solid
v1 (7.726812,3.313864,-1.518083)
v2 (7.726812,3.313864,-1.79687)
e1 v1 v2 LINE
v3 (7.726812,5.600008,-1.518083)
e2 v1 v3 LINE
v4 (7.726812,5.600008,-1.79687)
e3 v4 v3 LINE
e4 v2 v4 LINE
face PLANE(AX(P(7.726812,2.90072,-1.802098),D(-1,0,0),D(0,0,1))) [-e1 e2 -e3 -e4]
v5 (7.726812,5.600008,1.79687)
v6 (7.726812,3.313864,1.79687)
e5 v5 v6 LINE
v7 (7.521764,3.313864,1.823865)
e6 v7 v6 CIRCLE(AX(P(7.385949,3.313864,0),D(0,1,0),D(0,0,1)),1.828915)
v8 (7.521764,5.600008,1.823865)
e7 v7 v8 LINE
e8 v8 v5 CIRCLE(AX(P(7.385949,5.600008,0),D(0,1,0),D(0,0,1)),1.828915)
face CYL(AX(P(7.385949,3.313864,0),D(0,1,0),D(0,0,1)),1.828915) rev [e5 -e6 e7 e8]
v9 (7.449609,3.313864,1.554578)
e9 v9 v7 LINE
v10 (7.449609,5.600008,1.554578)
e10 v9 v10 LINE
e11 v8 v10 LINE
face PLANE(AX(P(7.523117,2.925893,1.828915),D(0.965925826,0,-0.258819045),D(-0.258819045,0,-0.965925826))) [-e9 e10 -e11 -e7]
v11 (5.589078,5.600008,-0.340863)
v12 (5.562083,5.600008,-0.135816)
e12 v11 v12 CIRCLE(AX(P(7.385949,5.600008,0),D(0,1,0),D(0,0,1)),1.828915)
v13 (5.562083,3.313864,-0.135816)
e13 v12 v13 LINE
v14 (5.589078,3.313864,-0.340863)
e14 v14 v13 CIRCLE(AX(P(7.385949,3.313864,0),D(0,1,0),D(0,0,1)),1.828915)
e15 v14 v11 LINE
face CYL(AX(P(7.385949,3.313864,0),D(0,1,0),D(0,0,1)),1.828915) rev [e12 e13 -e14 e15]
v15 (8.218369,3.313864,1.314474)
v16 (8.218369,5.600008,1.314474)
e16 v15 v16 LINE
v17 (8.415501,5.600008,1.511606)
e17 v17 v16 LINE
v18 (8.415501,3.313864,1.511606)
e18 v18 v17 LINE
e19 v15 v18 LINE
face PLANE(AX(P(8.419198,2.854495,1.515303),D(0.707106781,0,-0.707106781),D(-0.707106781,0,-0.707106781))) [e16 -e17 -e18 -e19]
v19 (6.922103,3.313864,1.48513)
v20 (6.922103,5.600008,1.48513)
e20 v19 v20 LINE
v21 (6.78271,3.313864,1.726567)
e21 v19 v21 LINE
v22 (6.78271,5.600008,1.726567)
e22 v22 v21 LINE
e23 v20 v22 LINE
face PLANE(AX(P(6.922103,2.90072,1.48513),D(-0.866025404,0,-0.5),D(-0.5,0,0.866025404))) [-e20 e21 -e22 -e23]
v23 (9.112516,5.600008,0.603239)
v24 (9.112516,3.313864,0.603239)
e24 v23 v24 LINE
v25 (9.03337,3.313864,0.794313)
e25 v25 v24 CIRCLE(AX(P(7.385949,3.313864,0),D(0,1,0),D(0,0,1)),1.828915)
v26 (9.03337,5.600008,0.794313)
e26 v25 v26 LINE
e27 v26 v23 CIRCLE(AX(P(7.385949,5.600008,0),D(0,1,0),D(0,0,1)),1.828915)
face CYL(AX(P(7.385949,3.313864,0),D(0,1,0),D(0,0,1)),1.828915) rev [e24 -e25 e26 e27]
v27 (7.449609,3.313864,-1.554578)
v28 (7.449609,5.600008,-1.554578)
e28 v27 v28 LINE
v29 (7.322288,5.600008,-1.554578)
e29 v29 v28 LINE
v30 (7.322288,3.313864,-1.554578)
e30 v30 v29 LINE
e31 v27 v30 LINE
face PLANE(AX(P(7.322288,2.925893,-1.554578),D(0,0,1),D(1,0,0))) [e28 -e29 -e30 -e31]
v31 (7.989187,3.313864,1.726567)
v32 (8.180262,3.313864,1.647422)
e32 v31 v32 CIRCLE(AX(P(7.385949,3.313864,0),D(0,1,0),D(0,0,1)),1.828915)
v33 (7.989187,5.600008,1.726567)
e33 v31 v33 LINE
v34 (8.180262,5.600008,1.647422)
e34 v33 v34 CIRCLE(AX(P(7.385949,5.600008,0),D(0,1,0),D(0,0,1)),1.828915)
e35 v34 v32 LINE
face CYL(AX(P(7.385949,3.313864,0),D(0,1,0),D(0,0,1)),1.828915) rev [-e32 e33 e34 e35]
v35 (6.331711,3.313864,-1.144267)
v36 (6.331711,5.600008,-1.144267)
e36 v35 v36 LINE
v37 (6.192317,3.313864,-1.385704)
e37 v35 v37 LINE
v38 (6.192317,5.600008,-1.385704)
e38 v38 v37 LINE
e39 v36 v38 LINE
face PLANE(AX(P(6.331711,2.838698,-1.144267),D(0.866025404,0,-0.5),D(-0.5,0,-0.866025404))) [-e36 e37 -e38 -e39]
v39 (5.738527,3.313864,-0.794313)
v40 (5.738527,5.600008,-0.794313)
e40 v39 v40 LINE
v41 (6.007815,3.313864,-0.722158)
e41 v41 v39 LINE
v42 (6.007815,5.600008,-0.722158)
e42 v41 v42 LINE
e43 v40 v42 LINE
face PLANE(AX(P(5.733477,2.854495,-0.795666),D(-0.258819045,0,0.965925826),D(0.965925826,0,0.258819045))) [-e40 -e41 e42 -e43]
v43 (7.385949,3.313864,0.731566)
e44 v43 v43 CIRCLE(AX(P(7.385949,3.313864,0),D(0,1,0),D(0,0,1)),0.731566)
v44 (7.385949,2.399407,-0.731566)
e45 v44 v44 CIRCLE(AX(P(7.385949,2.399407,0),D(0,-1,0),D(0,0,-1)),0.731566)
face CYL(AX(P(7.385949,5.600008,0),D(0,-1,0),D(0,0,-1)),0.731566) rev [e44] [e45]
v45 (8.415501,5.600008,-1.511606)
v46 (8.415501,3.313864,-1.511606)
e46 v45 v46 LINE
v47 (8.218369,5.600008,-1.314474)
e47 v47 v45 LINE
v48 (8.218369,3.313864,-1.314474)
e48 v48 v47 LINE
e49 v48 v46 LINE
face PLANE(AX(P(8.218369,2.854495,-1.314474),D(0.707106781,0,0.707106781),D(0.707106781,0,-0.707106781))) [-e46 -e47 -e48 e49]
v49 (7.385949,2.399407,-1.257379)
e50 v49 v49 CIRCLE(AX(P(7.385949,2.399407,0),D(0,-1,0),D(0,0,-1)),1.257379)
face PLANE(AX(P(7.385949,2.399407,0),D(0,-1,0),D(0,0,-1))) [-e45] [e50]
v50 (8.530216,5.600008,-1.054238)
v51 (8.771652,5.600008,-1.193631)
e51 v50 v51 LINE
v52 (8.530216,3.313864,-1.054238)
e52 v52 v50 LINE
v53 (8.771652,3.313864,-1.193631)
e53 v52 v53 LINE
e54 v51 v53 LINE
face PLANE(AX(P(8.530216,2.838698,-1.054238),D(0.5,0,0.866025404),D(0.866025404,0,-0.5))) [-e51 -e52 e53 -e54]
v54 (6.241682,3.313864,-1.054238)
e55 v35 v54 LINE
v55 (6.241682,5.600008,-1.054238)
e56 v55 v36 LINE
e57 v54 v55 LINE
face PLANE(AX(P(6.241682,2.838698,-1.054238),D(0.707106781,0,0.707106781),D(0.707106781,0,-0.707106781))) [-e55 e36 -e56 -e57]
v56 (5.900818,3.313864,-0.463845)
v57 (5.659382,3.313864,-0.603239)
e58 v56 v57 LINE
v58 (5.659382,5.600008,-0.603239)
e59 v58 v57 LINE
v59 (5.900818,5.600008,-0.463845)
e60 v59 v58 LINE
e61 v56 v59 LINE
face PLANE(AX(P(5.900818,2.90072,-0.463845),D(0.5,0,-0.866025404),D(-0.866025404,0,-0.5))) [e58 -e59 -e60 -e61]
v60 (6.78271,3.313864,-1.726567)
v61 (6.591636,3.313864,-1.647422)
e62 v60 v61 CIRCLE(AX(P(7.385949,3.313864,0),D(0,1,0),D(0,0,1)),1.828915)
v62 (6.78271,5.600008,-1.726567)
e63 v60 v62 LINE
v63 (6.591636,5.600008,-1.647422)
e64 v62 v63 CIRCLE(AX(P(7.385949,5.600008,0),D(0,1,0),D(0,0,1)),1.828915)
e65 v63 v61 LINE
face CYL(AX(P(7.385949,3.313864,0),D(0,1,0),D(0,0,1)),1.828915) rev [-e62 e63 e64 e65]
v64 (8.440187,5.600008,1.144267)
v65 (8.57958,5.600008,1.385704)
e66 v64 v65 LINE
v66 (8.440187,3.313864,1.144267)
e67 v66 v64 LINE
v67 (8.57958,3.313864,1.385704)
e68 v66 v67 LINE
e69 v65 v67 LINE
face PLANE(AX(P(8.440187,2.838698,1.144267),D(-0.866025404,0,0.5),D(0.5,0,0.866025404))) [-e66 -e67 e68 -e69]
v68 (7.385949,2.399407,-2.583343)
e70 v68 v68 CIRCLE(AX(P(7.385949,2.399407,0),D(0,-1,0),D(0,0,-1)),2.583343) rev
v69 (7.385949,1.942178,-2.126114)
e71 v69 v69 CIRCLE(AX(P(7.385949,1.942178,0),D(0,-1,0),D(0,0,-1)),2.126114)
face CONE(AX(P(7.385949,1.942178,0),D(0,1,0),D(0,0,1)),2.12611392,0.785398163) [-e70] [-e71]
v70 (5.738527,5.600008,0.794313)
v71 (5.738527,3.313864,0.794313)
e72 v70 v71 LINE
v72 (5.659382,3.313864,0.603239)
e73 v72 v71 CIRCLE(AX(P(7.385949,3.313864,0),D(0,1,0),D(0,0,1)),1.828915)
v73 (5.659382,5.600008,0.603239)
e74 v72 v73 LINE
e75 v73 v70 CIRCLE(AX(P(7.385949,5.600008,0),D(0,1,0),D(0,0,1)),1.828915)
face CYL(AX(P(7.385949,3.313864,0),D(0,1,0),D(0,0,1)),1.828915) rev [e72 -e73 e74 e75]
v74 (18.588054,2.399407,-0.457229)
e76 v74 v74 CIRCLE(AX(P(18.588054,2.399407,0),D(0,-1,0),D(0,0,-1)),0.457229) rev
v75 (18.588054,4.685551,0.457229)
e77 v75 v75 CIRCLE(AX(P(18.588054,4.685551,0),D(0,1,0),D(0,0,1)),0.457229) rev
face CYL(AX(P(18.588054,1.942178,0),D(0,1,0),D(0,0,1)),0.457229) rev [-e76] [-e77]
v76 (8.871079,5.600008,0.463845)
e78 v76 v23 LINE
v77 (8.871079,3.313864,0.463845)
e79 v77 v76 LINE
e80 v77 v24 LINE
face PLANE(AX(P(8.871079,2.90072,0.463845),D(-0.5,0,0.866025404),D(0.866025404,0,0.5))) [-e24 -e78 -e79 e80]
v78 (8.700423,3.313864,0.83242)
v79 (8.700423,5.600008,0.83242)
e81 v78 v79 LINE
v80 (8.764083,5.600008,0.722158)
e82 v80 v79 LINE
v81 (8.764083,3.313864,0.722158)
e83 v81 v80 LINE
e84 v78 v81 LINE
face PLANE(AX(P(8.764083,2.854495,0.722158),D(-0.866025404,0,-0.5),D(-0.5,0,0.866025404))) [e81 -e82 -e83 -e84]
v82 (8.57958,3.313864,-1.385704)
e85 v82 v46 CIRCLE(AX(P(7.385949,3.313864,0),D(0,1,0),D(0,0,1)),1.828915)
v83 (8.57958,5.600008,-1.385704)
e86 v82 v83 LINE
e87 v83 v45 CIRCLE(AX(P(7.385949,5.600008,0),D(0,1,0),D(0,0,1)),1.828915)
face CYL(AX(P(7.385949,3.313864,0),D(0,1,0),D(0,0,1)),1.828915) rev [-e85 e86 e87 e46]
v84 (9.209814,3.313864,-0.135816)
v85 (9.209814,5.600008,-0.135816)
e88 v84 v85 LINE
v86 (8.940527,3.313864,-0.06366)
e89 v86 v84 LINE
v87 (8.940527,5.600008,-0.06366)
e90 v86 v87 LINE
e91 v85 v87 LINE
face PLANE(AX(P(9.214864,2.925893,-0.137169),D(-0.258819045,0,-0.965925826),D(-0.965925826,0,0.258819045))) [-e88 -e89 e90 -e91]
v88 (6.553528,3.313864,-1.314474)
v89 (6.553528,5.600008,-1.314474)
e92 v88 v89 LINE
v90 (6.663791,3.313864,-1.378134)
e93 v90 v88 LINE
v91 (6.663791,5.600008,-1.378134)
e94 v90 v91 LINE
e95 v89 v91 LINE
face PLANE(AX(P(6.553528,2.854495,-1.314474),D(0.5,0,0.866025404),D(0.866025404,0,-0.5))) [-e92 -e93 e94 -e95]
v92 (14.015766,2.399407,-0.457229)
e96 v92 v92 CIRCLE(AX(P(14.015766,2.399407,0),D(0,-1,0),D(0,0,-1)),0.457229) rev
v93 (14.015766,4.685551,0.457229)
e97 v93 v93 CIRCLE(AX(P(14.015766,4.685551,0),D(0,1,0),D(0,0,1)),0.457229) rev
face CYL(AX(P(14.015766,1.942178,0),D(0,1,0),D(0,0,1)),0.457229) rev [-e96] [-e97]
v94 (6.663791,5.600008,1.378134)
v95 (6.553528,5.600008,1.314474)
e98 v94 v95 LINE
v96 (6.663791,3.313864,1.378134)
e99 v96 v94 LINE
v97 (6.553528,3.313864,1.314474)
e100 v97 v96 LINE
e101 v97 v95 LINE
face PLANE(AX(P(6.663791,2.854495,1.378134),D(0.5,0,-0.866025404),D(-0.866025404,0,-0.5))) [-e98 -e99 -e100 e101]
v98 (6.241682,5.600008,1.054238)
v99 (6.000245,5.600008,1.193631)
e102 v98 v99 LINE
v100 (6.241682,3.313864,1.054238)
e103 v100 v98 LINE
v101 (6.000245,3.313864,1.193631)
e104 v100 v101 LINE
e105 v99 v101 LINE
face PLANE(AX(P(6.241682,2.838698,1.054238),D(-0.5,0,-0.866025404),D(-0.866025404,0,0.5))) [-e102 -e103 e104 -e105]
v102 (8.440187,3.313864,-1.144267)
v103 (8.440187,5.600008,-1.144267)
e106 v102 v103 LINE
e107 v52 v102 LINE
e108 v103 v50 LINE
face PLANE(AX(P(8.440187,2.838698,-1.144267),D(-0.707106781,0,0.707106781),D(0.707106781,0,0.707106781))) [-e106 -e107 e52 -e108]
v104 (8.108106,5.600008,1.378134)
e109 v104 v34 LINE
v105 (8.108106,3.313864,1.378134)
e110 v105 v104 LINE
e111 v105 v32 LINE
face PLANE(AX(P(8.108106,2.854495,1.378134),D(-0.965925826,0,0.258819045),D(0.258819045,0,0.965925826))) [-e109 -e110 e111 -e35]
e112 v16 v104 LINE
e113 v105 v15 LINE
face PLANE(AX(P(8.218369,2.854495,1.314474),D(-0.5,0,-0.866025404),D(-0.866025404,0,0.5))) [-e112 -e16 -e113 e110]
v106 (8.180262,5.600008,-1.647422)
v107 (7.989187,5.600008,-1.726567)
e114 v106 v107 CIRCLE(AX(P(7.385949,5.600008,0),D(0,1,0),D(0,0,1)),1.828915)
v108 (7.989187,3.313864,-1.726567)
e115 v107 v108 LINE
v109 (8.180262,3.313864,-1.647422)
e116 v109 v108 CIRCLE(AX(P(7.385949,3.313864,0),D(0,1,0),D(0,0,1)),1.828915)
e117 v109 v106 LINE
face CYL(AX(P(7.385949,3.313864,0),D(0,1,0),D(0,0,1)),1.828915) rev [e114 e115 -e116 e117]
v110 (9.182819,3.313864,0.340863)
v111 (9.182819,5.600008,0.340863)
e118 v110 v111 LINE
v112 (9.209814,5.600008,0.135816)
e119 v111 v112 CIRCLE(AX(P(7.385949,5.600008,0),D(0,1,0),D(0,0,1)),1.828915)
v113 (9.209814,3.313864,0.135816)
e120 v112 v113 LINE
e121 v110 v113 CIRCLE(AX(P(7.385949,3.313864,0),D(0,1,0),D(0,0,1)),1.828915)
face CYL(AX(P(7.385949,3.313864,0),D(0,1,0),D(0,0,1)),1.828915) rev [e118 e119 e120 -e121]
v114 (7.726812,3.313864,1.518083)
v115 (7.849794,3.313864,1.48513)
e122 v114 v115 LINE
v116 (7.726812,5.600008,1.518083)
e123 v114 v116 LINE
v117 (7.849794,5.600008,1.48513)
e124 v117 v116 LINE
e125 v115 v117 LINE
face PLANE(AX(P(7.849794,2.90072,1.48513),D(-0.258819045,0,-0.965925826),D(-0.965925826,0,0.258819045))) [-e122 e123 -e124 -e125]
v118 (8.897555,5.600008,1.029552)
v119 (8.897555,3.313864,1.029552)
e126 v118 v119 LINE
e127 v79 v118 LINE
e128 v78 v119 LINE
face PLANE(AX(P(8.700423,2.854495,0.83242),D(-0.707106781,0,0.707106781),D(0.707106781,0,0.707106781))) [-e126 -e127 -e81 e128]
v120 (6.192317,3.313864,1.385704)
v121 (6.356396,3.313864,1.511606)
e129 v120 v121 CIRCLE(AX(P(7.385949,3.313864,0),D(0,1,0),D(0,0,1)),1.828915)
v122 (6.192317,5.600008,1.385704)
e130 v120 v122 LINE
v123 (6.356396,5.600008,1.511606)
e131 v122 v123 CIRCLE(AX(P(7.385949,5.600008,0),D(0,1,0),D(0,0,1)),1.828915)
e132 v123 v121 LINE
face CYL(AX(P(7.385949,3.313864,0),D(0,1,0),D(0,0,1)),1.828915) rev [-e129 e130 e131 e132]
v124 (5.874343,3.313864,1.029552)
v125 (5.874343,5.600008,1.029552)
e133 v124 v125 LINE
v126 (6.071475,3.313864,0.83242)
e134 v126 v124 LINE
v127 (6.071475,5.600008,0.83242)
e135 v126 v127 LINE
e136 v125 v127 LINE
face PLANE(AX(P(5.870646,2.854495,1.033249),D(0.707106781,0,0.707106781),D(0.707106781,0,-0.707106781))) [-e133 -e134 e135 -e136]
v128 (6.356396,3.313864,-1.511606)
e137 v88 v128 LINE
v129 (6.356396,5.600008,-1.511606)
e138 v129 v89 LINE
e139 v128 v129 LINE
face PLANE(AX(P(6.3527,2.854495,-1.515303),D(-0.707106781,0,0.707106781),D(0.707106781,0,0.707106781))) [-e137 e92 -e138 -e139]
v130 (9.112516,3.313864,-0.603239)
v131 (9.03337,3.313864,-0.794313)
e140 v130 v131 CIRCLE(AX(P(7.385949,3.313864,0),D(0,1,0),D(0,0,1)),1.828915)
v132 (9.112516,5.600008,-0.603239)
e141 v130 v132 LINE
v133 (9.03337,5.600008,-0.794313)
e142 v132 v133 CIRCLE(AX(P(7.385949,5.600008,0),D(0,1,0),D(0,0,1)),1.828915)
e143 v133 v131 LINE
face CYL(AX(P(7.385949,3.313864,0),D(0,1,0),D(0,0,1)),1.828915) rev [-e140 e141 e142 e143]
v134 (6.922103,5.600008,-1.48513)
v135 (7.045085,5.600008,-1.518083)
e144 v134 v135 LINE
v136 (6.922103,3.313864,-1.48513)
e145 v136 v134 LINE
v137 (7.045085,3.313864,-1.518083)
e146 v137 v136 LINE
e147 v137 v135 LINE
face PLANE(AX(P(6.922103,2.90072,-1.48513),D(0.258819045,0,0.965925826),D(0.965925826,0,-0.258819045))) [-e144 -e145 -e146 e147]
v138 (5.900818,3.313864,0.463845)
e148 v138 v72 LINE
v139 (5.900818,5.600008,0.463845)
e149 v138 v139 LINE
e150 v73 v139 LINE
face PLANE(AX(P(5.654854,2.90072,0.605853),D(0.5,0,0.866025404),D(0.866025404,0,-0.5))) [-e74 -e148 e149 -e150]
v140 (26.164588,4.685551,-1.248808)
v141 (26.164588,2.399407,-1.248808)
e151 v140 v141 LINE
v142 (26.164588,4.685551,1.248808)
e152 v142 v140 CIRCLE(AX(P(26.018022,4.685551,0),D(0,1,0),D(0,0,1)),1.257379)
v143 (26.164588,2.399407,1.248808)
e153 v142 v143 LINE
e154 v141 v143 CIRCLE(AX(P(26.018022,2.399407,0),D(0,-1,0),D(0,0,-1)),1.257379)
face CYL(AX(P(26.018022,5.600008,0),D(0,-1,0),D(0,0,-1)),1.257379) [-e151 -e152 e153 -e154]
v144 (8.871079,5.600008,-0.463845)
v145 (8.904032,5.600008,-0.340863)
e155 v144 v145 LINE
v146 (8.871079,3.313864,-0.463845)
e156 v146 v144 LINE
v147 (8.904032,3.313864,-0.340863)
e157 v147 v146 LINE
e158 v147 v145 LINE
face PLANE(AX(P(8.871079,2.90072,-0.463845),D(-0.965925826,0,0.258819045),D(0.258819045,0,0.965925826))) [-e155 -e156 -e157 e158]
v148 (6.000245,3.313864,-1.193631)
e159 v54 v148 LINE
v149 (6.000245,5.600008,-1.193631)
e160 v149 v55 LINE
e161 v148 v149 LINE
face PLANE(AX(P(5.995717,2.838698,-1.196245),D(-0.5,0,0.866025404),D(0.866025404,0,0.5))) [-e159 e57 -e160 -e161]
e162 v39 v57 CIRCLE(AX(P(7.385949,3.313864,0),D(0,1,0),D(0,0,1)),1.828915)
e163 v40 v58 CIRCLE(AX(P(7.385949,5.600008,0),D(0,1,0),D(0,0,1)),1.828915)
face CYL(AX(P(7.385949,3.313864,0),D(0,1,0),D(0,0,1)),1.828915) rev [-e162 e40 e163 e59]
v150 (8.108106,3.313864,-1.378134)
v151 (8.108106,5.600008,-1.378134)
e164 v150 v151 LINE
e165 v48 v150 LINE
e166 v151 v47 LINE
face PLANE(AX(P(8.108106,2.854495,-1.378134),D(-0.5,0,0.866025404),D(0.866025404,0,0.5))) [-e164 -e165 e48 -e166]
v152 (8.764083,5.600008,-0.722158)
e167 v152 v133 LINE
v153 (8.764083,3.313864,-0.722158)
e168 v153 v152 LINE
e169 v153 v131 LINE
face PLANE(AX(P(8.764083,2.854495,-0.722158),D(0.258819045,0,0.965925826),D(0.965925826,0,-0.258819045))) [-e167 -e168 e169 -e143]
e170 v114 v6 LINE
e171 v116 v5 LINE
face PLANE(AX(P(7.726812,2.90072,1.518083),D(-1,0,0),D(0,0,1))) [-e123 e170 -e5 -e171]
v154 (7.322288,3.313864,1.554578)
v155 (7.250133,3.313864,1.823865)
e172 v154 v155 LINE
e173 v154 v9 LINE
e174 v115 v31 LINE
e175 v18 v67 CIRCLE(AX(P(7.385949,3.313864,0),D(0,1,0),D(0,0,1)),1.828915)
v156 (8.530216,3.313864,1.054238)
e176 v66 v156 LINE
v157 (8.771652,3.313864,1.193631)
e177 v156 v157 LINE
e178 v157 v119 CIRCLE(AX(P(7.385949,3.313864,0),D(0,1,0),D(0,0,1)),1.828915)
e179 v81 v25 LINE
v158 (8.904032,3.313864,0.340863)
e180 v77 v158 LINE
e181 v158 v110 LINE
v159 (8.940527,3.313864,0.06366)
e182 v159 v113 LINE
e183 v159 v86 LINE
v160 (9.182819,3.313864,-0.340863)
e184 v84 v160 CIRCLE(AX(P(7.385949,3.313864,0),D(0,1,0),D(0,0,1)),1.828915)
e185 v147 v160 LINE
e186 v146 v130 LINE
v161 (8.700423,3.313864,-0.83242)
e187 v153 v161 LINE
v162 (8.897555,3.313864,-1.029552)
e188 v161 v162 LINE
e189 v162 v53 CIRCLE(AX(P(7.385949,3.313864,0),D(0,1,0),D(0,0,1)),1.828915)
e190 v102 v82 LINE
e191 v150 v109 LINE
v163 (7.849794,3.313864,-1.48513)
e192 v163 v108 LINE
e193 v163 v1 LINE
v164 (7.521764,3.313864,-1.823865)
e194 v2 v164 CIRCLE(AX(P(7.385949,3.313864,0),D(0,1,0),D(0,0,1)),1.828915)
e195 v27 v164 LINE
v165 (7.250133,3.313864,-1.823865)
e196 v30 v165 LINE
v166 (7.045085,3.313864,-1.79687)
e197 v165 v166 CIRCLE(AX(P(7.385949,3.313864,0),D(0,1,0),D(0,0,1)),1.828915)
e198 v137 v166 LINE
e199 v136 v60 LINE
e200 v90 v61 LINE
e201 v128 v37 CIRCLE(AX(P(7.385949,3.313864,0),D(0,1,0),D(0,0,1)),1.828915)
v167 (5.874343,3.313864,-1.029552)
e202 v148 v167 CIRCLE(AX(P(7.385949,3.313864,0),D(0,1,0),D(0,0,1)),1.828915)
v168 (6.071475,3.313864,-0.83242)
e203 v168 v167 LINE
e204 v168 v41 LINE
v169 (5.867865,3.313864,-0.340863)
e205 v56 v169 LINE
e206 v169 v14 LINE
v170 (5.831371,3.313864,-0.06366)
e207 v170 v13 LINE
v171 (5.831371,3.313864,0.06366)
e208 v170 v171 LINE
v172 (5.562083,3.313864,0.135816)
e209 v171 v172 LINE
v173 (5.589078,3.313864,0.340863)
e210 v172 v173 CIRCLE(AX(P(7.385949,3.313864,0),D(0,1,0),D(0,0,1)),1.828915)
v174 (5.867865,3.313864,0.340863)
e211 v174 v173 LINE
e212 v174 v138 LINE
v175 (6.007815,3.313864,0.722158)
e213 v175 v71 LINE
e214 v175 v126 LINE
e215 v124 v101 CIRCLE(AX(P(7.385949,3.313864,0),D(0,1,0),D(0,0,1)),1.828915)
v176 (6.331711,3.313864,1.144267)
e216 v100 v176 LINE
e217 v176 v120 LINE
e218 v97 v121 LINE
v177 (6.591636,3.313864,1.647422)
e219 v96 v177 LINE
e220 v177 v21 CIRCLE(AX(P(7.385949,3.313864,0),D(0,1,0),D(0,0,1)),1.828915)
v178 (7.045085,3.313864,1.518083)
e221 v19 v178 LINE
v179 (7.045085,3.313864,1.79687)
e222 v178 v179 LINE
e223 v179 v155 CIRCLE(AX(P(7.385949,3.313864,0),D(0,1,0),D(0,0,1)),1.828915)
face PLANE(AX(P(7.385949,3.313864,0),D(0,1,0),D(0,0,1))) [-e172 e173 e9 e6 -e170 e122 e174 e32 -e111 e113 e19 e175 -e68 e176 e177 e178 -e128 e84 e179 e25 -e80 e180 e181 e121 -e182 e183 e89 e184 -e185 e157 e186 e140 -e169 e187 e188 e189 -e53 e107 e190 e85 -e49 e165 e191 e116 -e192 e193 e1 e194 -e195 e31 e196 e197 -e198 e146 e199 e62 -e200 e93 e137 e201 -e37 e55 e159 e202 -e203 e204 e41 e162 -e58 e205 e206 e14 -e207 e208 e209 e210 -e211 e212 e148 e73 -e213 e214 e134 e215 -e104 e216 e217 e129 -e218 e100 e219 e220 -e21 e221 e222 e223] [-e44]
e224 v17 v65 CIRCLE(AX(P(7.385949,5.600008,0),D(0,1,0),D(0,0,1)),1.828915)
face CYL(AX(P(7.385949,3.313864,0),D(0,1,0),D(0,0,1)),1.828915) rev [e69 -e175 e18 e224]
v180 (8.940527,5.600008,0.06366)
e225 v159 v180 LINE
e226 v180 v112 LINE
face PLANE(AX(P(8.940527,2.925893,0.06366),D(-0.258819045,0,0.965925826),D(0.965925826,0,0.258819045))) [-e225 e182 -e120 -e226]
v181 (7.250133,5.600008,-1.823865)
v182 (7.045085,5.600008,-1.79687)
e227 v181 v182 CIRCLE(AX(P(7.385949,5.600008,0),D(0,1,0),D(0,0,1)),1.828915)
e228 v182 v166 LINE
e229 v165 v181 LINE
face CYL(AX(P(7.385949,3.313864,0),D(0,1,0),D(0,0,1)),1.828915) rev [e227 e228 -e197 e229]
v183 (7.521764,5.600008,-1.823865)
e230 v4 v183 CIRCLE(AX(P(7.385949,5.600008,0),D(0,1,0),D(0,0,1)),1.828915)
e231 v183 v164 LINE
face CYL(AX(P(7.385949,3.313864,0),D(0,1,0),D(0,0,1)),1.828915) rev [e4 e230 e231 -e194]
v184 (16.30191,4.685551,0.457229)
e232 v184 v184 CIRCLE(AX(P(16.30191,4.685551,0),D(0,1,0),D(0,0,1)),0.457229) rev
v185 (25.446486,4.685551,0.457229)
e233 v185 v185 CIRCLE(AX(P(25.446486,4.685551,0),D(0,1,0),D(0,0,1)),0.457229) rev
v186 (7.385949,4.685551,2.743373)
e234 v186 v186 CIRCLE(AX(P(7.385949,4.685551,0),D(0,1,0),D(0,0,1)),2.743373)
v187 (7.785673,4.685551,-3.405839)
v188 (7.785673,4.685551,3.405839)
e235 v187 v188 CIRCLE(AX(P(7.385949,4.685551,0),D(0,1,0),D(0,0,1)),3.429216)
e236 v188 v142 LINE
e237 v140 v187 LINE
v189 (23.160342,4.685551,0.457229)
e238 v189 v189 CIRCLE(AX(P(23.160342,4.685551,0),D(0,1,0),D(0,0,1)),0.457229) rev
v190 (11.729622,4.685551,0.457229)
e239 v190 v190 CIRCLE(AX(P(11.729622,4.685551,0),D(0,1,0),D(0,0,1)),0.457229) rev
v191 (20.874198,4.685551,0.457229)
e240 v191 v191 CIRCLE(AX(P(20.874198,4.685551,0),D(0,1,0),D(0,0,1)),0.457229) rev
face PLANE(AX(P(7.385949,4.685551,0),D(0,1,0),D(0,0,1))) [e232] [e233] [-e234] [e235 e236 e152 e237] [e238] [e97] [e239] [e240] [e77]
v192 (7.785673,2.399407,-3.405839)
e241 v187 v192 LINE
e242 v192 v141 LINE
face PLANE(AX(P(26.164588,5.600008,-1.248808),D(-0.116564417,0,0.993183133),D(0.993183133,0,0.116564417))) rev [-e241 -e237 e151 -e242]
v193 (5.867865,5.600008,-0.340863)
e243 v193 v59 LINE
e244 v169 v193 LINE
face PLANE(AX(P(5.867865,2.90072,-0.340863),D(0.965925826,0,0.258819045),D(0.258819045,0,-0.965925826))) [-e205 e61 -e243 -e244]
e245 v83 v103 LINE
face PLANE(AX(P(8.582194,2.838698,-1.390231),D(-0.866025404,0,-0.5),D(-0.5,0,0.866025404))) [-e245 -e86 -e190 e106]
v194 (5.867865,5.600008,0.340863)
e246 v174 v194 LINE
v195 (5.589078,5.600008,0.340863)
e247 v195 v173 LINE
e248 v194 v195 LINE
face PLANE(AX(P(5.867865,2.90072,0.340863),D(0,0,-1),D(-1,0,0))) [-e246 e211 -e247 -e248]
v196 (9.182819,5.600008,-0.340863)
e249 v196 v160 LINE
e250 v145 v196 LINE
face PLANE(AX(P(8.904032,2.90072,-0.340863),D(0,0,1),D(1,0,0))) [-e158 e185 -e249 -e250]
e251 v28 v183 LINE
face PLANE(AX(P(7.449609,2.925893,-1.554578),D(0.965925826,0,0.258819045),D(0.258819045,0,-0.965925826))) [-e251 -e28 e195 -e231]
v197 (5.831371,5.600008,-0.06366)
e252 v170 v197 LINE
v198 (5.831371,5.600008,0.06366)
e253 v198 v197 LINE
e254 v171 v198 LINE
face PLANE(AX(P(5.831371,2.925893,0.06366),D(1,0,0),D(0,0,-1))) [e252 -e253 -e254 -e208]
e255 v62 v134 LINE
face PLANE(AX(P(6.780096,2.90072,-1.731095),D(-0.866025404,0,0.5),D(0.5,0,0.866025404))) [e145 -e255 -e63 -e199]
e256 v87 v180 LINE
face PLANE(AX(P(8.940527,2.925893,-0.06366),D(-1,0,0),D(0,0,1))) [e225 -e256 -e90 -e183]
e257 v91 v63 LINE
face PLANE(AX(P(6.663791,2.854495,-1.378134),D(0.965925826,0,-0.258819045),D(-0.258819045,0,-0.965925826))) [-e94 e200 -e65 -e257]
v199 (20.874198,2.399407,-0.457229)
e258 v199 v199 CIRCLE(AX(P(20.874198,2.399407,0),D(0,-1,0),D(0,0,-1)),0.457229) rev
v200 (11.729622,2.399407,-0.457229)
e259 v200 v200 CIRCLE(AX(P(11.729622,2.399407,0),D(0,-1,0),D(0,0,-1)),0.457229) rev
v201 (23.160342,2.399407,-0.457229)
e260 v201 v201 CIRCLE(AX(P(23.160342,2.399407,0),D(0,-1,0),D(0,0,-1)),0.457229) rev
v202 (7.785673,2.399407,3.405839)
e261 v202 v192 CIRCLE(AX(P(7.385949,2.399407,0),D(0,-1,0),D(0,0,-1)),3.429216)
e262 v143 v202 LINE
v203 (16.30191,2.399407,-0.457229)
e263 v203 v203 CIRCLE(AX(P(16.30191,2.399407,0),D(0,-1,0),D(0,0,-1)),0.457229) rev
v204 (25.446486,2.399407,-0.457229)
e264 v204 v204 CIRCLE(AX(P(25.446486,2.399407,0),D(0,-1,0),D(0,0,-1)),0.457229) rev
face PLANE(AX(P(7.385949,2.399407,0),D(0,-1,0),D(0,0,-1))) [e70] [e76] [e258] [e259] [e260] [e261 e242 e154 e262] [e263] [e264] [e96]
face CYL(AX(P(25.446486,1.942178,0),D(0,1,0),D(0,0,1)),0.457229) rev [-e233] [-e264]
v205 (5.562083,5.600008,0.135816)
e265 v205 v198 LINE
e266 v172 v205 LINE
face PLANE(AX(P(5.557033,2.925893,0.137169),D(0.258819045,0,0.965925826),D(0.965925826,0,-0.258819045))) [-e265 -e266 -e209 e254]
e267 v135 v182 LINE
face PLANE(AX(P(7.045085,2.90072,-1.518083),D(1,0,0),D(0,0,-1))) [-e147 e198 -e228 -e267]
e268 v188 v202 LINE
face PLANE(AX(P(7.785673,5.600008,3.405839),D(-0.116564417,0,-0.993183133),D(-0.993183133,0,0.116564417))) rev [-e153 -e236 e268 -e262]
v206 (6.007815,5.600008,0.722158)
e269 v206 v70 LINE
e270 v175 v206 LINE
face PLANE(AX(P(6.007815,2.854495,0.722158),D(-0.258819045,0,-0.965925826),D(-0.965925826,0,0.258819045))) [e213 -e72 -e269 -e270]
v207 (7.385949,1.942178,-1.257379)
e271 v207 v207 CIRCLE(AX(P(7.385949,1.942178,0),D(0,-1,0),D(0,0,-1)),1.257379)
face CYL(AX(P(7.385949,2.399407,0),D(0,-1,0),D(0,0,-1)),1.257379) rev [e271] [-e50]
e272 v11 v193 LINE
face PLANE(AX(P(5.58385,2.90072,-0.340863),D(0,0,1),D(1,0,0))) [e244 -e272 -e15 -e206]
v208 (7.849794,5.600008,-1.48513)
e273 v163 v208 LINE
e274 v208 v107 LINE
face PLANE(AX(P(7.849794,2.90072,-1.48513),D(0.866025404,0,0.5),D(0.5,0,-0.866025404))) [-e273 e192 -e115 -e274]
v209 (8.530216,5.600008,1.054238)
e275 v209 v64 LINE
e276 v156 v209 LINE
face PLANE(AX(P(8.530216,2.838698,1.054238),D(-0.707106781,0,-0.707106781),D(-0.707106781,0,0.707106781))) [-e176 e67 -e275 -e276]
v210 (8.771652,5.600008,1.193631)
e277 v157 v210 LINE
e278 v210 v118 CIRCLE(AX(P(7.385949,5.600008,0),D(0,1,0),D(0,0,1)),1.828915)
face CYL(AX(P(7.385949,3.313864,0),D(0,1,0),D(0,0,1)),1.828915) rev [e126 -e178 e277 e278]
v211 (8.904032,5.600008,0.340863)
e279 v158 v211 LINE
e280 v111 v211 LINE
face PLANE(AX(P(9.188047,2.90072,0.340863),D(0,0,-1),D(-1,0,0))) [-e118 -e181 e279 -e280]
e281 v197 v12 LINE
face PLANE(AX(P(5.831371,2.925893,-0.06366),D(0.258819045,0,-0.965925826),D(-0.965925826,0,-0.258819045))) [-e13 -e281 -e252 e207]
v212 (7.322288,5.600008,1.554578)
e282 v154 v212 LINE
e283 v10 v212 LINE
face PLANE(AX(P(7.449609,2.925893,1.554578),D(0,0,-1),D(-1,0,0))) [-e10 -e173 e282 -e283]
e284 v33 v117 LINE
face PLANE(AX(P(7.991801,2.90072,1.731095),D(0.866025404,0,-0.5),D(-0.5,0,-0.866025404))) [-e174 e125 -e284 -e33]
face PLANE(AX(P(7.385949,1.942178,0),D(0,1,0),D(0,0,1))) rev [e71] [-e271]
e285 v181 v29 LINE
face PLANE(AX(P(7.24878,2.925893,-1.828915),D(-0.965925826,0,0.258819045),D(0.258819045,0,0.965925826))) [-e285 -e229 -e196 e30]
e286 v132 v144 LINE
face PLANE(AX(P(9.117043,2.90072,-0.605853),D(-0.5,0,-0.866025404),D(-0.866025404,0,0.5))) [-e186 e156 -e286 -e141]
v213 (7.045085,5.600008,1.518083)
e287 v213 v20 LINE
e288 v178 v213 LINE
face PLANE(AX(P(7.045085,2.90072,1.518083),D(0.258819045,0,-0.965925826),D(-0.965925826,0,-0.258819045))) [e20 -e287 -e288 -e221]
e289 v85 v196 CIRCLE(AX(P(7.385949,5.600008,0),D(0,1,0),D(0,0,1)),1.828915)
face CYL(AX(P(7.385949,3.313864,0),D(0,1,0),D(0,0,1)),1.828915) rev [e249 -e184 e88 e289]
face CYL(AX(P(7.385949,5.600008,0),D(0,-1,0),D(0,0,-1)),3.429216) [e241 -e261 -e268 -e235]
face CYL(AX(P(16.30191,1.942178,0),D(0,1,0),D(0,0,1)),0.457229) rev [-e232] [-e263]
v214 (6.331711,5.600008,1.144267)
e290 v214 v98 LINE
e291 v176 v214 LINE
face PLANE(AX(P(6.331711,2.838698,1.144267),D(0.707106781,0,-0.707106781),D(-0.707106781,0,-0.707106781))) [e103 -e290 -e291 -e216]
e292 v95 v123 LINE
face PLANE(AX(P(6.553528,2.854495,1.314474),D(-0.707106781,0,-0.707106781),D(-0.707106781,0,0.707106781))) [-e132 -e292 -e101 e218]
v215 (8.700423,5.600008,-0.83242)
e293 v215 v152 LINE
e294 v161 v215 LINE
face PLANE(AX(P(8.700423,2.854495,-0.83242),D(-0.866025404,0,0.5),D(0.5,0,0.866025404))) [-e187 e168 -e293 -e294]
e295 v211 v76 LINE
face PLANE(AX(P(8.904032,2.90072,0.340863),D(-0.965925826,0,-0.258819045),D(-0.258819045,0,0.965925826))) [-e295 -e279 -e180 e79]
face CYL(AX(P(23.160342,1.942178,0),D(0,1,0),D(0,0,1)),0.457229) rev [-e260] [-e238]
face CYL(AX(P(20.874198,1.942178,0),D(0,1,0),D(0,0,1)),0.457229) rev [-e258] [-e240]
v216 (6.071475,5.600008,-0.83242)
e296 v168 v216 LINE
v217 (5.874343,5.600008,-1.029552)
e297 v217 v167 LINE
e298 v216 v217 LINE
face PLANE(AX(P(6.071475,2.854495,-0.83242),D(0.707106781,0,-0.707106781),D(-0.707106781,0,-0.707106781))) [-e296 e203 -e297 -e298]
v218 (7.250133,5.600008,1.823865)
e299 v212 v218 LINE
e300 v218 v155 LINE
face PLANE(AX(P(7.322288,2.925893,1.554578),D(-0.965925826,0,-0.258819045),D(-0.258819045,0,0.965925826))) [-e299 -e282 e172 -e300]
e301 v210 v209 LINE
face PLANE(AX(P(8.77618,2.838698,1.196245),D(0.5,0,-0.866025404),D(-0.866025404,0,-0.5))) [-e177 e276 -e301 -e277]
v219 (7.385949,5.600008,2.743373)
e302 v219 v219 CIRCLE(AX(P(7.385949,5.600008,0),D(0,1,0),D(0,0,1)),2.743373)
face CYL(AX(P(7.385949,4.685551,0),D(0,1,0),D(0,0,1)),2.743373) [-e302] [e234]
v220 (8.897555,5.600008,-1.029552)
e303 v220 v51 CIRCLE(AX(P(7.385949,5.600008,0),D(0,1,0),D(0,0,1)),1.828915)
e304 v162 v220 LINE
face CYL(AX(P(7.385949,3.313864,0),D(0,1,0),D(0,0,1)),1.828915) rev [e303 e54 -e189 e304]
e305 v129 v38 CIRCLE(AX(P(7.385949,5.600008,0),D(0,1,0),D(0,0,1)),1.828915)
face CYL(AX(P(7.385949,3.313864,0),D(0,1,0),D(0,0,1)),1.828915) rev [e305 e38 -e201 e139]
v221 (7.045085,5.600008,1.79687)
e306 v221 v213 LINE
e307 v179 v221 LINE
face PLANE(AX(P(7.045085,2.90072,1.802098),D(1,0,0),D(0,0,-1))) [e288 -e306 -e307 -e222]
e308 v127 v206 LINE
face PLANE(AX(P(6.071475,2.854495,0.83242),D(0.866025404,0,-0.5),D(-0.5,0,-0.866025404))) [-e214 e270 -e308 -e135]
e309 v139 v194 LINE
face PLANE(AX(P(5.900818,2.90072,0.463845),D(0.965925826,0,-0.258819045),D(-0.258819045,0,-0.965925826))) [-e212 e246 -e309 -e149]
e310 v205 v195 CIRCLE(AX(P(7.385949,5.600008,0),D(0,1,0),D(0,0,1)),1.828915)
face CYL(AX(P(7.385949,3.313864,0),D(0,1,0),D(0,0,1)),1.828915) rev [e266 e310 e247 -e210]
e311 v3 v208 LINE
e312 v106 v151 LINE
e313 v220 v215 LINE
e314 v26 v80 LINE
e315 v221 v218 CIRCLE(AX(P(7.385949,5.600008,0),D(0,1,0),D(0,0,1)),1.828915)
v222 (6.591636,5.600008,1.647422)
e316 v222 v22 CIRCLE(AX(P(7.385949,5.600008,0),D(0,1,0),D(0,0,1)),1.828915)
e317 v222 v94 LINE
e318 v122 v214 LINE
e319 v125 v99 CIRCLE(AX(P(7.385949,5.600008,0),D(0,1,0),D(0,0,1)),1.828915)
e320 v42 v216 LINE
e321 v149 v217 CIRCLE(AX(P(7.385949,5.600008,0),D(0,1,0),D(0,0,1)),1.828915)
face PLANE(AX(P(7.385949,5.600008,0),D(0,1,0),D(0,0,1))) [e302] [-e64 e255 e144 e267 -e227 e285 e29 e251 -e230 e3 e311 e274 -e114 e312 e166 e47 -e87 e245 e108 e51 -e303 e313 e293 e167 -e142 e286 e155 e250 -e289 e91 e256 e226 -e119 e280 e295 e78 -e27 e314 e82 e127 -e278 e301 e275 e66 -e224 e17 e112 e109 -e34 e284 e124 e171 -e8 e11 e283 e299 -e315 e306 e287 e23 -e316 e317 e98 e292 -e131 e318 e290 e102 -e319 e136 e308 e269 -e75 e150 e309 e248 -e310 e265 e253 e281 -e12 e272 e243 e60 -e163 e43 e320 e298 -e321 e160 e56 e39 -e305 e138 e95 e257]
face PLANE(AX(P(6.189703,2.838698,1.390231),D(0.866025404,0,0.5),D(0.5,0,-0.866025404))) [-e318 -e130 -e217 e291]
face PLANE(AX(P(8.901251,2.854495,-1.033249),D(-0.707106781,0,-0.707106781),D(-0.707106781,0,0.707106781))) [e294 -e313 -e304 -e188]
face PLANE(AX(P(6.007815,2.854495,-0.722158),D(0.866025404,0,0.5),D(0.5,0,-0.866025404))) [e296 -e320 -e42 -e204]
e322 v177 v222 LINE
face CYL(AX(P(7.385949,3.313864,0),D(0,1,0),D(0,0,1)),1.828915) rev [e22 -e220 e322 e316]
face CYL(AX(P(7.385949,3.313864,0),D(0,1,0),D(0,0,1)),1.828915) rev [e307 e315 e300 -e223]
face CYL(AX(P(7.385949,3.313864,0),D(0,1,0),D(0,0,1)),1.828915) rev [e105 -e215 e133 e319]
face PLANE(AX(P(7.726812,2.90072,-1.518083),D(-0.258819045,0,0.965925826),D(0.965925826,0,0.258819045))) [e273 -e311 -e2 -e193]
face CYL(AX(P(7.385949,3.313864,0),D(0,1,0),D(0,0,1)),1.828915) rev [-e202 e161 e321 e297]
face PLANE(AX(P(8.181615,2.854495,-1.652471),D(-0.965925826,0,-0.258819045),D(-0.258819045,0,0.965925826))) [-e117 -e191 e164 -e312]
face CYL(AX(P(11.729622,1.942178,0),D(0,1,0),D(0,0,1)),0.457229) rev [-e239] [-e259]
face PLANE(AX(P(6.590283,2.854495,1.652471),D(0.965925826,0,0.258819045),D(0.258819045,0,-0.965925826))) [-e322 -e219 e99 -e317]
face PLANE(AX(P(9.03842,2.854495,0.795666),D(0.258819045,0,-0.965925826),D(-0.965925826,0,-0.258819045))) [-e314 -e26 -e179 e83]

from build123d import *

# Parameters (mm, degrees)
ESQUISSE1_R                  = 1.6
BOSS_EXTRU_1_DEPTH           = 8
ESQUISSE2_R                  = 1
ENL_V_MAT_EXTRU_1_DEPTH      = 8
R_P_TITION_LIN_AIRE1_COUNT   = 7
R_P_TITION_LIN_AIRE1_PITCH   = 5
ESQUISSE3_W                  = 63.02569825
ESQUISSE3_H                  = 22.447508966
ESQUISSE3_R                  = 6
ENL_V_MAT_EXTRU_2_DEPTH      = 2
ESQUISSE4_W                  = 65.150237544
ESQUISSE4_H                  = 23.585889013
ESQUISSE4_R                  = 4.65
ENL_V_MAT_EXTRU_3_DEPTH      = 1
ESQUISSE5_R                  = 2.75
ENL_V_MAT_EXTRU_4_DEPTH      = 1
CHANFREIN1_SIZE              = 1
ESQUISSE6_R                  = 4
ENL_V_MAT_EXTRU_5_DEPTH      = 5
BOSS_EXTRU_2_DEPTH           = 5
R_P_TITION_CIRCULAIRE1_COUNT = 24
ESCALA2_SCALE                = 0.7
ESCALA5_SCALE                = 0.8
ESCALA6_SCALE                = 0.9
ESCALA7_SCALE                = 0.9
ESCALA8_SCALE                = 1.05
ESCALA9_SCALE                = 1.2
ESCALA11_SCALE               = 0.8


with BuildPart() as part:
    # Esquisse1 → Boss.-Extru.1 (new body)
    with BuildSketch(Plane(origin=(0, 0, 0), x_dir=(1, 0, 0), z_dir=(0, 1, 0))):
        with BuildLine():
            Line((0.874233129, -7.448873501), (41.070552147, -2.731253617))
            ThreePointArc((41.070552147, -2.731253617), (43.5, 0), (41.070552147, 2.731253617))
            Line((41.070552147, 2.731253617), (0.874233129, 7.448873501))
            ThreePointArc((0.874233129, 7.448873501), (-7.5, 0), (0.874233129, -7.448873501))
        make_face()
        with Locations(Location((0, 0, 0), (0, 0, 270))):
            Circle(ESQUISSE1_R, mode=Mode.SUBTRACT)
    extrude(amount=BOSS_EXTRU_1_DEPTH)

    # Esquisse2 → Enlèv. mat.-Extru.1 (cut)
    with BuildSketch(Plane(origin=(0, 8, 0), x_dir=(1, 0, 0), z_dir=(0, 1, 0))):
        with Locations(Location((9.5, 0, 0), (0, 0, 270))):
            Circle(ESQUISSE2_R)
    enl_v_mat_extru_1 = extrude(amount=-ENL_V_MAT_EXTRU_1_DEPTH, mode=Mode.SUBTRACT)

    # Répétition linéaire1: Enlèv. mat.-Extru.1 ×7
    with Locations(*[(i * R_P_TITION_LIN_AIRE1_PITCH, 0, 0) for i in range(1, R_P_TITION_LIN_AIRE1_COUNT)]):
        add(enl_v_mat_extru_1, mode=Mode.SUBTRACT)

    # Esquisse3 → Enlèv. mat.-Extru.2 (cut)
    with BuildSketch(Plane(origin=(0, 8, 0), x_dir=(1, 0, 0), z_dir=(0, 1, 0))):
        with Locations((18.729808022, -1.006570064)):
            Rectangle(ESQUISSE3_W, ESQUISSE3_H)
        with Locations(Location((0, 0, 0), (0, 0, 270))):
            Circle(ESQUISSE3_R, mode=Mode.SUBTRACT)
    extrude(amount=-ENL_V_MAT_EXTRU_2_DEPTH, mode=Mode.SUBTRACT)

    # Esquisse4 → Enlèv. mat.-Extru.3 (cut)
    with BuildSketch(Plane.XZ):
        with Locations((19.098187779, 0.565848797)):
            Rectangle(ESQUISSE4_W, ESQUISSE4_H)
        with Locations(Location((0, 0, 0), (0, 0, 270))):
            Circle(ESQUISSE4_R, mode=Mode.SUBTRACT)
    extrude(amount=-ENL_V_MAT_EXTRU_3_DEPTH, mode=Mode.SUBTRACT)

    # Esquisse5 → Enlèv. mat.-Extru.4 (cut)
    with BuildSketch(Plane.XZ):
        with Locations(Location((0, 0, 0), (0, 0, 270))):
            Circle(ESQUISSE5_R)
    extrude(amount=-ENL_V_MAT_EXTRU_4_DEPTH, mode=Mode.SUBTRACT)

    # Chanfrein1
    chanfrein1_edges = [part.edges().sort_by_distance(p)[0] for p in [
        (0, 1, 4.65),
    ]]
    chamfer(chanfrein1_edges, length=CHANFREIN1_SIZE - 0.0001)  # a hair under: the kernel refuses the full size

    # Esquisse6 → Enlèv. mat.-Extru.5 (cut)
    with BuildSketch(Plane(origin=(0, 8, 0), x_dir=(1, 0, 0), z_dir=(0, 1, 0))):
        with Locations(Location((0, 0, 0), (0, 0, 270))):
            Circle(ESQUISSE6_R)
    extrude(amount=-ENL_V_MAT_EXTRU_5_DEPTH, mode=Mode.SUBTRACT)

    # Esquisse7 → Boss.-Extru.2 (add)
    with BuildSketch(Plane(origin=(0, 8, 0), x_dir=(1, 0, 0), z_dir=(0, 1, 0))):
        Polygon((0.3, -4), (0.139230485, -3.4), (-0.139230485, -3.4), (-0.3, -4), align=None)
    boss_extru_2 = extrude(amount=-BOSS_EXTRU_2_DEPTH)

    # Répétition circulaire1: Boss.-Extru.2 ×24 about axis
    r_p_tition_circulaire1_axis = Axis((0, 0, 0), (0, 1, 0))
    for i in range(1, R_P_TITION_CIRCULAIRE1_COUNT):
        add(boss_extru_2.rotate(r_p_tition_circulaire1_axis, i * 360 / R_P_TITION_CIRCULAIRE1_COUNT))


with BuildPart() as part_1:
    # Escala2: scaled about (13.607866543, 3.578266839, 0)
    add(part.part.scale(ESCALA2_SCALE).moved(Location((4.082359963, 1.073480052, 0))))


with BuildPart() as part_2:
    # Escala5: scaled about (13.607866543, 3.578266839, 0)
    add(part_1.part.scale(ESCALA5_SCALE).moved(Location((2.721573309, 0.715653368, 0))))


with BuildPart() as part_3:
    # Escala6: scaled about (13.607866543, 3.578266839, 0)
    add(part_2.part.scale(ESCALA6_SCALE).moved(Location((1.360786654, 0.357826684, 0))))


with BuildPart() as part_4:
    # Escala7: scaled about (13.607866543, 3.578266839, 0)
    add(part_3.part.scale(ESCALA7_SCALE).moved(Location((1.360786654, 0.357826684, 0))))


with BuildPart() as part_5:
    # Escala8: scaled about (13.607866543, 3.578266839, 0)
    add(part_4.part.scale(ESCALA8_SCALE).moved(Location((-0.680393327, -0.178913342, 0))))


with BuildPart() as part_6:
    # Escala9: scaled about (13.607866543, 3.578266839, 0)
    add(part_5.part.scale(ESCALA9_SCALE).moved(Location((-2.721573309, -0.715653368, 0))))


with BuildPart() as part_7:
    # Escala11: scaled about (13.607866543, 3.578266839, 0)
    add(part_6.part.scale(ESCALA11_SCALE).moved(Location((2.721573309, 0.715653368, 0))))


solid = part_7.part
